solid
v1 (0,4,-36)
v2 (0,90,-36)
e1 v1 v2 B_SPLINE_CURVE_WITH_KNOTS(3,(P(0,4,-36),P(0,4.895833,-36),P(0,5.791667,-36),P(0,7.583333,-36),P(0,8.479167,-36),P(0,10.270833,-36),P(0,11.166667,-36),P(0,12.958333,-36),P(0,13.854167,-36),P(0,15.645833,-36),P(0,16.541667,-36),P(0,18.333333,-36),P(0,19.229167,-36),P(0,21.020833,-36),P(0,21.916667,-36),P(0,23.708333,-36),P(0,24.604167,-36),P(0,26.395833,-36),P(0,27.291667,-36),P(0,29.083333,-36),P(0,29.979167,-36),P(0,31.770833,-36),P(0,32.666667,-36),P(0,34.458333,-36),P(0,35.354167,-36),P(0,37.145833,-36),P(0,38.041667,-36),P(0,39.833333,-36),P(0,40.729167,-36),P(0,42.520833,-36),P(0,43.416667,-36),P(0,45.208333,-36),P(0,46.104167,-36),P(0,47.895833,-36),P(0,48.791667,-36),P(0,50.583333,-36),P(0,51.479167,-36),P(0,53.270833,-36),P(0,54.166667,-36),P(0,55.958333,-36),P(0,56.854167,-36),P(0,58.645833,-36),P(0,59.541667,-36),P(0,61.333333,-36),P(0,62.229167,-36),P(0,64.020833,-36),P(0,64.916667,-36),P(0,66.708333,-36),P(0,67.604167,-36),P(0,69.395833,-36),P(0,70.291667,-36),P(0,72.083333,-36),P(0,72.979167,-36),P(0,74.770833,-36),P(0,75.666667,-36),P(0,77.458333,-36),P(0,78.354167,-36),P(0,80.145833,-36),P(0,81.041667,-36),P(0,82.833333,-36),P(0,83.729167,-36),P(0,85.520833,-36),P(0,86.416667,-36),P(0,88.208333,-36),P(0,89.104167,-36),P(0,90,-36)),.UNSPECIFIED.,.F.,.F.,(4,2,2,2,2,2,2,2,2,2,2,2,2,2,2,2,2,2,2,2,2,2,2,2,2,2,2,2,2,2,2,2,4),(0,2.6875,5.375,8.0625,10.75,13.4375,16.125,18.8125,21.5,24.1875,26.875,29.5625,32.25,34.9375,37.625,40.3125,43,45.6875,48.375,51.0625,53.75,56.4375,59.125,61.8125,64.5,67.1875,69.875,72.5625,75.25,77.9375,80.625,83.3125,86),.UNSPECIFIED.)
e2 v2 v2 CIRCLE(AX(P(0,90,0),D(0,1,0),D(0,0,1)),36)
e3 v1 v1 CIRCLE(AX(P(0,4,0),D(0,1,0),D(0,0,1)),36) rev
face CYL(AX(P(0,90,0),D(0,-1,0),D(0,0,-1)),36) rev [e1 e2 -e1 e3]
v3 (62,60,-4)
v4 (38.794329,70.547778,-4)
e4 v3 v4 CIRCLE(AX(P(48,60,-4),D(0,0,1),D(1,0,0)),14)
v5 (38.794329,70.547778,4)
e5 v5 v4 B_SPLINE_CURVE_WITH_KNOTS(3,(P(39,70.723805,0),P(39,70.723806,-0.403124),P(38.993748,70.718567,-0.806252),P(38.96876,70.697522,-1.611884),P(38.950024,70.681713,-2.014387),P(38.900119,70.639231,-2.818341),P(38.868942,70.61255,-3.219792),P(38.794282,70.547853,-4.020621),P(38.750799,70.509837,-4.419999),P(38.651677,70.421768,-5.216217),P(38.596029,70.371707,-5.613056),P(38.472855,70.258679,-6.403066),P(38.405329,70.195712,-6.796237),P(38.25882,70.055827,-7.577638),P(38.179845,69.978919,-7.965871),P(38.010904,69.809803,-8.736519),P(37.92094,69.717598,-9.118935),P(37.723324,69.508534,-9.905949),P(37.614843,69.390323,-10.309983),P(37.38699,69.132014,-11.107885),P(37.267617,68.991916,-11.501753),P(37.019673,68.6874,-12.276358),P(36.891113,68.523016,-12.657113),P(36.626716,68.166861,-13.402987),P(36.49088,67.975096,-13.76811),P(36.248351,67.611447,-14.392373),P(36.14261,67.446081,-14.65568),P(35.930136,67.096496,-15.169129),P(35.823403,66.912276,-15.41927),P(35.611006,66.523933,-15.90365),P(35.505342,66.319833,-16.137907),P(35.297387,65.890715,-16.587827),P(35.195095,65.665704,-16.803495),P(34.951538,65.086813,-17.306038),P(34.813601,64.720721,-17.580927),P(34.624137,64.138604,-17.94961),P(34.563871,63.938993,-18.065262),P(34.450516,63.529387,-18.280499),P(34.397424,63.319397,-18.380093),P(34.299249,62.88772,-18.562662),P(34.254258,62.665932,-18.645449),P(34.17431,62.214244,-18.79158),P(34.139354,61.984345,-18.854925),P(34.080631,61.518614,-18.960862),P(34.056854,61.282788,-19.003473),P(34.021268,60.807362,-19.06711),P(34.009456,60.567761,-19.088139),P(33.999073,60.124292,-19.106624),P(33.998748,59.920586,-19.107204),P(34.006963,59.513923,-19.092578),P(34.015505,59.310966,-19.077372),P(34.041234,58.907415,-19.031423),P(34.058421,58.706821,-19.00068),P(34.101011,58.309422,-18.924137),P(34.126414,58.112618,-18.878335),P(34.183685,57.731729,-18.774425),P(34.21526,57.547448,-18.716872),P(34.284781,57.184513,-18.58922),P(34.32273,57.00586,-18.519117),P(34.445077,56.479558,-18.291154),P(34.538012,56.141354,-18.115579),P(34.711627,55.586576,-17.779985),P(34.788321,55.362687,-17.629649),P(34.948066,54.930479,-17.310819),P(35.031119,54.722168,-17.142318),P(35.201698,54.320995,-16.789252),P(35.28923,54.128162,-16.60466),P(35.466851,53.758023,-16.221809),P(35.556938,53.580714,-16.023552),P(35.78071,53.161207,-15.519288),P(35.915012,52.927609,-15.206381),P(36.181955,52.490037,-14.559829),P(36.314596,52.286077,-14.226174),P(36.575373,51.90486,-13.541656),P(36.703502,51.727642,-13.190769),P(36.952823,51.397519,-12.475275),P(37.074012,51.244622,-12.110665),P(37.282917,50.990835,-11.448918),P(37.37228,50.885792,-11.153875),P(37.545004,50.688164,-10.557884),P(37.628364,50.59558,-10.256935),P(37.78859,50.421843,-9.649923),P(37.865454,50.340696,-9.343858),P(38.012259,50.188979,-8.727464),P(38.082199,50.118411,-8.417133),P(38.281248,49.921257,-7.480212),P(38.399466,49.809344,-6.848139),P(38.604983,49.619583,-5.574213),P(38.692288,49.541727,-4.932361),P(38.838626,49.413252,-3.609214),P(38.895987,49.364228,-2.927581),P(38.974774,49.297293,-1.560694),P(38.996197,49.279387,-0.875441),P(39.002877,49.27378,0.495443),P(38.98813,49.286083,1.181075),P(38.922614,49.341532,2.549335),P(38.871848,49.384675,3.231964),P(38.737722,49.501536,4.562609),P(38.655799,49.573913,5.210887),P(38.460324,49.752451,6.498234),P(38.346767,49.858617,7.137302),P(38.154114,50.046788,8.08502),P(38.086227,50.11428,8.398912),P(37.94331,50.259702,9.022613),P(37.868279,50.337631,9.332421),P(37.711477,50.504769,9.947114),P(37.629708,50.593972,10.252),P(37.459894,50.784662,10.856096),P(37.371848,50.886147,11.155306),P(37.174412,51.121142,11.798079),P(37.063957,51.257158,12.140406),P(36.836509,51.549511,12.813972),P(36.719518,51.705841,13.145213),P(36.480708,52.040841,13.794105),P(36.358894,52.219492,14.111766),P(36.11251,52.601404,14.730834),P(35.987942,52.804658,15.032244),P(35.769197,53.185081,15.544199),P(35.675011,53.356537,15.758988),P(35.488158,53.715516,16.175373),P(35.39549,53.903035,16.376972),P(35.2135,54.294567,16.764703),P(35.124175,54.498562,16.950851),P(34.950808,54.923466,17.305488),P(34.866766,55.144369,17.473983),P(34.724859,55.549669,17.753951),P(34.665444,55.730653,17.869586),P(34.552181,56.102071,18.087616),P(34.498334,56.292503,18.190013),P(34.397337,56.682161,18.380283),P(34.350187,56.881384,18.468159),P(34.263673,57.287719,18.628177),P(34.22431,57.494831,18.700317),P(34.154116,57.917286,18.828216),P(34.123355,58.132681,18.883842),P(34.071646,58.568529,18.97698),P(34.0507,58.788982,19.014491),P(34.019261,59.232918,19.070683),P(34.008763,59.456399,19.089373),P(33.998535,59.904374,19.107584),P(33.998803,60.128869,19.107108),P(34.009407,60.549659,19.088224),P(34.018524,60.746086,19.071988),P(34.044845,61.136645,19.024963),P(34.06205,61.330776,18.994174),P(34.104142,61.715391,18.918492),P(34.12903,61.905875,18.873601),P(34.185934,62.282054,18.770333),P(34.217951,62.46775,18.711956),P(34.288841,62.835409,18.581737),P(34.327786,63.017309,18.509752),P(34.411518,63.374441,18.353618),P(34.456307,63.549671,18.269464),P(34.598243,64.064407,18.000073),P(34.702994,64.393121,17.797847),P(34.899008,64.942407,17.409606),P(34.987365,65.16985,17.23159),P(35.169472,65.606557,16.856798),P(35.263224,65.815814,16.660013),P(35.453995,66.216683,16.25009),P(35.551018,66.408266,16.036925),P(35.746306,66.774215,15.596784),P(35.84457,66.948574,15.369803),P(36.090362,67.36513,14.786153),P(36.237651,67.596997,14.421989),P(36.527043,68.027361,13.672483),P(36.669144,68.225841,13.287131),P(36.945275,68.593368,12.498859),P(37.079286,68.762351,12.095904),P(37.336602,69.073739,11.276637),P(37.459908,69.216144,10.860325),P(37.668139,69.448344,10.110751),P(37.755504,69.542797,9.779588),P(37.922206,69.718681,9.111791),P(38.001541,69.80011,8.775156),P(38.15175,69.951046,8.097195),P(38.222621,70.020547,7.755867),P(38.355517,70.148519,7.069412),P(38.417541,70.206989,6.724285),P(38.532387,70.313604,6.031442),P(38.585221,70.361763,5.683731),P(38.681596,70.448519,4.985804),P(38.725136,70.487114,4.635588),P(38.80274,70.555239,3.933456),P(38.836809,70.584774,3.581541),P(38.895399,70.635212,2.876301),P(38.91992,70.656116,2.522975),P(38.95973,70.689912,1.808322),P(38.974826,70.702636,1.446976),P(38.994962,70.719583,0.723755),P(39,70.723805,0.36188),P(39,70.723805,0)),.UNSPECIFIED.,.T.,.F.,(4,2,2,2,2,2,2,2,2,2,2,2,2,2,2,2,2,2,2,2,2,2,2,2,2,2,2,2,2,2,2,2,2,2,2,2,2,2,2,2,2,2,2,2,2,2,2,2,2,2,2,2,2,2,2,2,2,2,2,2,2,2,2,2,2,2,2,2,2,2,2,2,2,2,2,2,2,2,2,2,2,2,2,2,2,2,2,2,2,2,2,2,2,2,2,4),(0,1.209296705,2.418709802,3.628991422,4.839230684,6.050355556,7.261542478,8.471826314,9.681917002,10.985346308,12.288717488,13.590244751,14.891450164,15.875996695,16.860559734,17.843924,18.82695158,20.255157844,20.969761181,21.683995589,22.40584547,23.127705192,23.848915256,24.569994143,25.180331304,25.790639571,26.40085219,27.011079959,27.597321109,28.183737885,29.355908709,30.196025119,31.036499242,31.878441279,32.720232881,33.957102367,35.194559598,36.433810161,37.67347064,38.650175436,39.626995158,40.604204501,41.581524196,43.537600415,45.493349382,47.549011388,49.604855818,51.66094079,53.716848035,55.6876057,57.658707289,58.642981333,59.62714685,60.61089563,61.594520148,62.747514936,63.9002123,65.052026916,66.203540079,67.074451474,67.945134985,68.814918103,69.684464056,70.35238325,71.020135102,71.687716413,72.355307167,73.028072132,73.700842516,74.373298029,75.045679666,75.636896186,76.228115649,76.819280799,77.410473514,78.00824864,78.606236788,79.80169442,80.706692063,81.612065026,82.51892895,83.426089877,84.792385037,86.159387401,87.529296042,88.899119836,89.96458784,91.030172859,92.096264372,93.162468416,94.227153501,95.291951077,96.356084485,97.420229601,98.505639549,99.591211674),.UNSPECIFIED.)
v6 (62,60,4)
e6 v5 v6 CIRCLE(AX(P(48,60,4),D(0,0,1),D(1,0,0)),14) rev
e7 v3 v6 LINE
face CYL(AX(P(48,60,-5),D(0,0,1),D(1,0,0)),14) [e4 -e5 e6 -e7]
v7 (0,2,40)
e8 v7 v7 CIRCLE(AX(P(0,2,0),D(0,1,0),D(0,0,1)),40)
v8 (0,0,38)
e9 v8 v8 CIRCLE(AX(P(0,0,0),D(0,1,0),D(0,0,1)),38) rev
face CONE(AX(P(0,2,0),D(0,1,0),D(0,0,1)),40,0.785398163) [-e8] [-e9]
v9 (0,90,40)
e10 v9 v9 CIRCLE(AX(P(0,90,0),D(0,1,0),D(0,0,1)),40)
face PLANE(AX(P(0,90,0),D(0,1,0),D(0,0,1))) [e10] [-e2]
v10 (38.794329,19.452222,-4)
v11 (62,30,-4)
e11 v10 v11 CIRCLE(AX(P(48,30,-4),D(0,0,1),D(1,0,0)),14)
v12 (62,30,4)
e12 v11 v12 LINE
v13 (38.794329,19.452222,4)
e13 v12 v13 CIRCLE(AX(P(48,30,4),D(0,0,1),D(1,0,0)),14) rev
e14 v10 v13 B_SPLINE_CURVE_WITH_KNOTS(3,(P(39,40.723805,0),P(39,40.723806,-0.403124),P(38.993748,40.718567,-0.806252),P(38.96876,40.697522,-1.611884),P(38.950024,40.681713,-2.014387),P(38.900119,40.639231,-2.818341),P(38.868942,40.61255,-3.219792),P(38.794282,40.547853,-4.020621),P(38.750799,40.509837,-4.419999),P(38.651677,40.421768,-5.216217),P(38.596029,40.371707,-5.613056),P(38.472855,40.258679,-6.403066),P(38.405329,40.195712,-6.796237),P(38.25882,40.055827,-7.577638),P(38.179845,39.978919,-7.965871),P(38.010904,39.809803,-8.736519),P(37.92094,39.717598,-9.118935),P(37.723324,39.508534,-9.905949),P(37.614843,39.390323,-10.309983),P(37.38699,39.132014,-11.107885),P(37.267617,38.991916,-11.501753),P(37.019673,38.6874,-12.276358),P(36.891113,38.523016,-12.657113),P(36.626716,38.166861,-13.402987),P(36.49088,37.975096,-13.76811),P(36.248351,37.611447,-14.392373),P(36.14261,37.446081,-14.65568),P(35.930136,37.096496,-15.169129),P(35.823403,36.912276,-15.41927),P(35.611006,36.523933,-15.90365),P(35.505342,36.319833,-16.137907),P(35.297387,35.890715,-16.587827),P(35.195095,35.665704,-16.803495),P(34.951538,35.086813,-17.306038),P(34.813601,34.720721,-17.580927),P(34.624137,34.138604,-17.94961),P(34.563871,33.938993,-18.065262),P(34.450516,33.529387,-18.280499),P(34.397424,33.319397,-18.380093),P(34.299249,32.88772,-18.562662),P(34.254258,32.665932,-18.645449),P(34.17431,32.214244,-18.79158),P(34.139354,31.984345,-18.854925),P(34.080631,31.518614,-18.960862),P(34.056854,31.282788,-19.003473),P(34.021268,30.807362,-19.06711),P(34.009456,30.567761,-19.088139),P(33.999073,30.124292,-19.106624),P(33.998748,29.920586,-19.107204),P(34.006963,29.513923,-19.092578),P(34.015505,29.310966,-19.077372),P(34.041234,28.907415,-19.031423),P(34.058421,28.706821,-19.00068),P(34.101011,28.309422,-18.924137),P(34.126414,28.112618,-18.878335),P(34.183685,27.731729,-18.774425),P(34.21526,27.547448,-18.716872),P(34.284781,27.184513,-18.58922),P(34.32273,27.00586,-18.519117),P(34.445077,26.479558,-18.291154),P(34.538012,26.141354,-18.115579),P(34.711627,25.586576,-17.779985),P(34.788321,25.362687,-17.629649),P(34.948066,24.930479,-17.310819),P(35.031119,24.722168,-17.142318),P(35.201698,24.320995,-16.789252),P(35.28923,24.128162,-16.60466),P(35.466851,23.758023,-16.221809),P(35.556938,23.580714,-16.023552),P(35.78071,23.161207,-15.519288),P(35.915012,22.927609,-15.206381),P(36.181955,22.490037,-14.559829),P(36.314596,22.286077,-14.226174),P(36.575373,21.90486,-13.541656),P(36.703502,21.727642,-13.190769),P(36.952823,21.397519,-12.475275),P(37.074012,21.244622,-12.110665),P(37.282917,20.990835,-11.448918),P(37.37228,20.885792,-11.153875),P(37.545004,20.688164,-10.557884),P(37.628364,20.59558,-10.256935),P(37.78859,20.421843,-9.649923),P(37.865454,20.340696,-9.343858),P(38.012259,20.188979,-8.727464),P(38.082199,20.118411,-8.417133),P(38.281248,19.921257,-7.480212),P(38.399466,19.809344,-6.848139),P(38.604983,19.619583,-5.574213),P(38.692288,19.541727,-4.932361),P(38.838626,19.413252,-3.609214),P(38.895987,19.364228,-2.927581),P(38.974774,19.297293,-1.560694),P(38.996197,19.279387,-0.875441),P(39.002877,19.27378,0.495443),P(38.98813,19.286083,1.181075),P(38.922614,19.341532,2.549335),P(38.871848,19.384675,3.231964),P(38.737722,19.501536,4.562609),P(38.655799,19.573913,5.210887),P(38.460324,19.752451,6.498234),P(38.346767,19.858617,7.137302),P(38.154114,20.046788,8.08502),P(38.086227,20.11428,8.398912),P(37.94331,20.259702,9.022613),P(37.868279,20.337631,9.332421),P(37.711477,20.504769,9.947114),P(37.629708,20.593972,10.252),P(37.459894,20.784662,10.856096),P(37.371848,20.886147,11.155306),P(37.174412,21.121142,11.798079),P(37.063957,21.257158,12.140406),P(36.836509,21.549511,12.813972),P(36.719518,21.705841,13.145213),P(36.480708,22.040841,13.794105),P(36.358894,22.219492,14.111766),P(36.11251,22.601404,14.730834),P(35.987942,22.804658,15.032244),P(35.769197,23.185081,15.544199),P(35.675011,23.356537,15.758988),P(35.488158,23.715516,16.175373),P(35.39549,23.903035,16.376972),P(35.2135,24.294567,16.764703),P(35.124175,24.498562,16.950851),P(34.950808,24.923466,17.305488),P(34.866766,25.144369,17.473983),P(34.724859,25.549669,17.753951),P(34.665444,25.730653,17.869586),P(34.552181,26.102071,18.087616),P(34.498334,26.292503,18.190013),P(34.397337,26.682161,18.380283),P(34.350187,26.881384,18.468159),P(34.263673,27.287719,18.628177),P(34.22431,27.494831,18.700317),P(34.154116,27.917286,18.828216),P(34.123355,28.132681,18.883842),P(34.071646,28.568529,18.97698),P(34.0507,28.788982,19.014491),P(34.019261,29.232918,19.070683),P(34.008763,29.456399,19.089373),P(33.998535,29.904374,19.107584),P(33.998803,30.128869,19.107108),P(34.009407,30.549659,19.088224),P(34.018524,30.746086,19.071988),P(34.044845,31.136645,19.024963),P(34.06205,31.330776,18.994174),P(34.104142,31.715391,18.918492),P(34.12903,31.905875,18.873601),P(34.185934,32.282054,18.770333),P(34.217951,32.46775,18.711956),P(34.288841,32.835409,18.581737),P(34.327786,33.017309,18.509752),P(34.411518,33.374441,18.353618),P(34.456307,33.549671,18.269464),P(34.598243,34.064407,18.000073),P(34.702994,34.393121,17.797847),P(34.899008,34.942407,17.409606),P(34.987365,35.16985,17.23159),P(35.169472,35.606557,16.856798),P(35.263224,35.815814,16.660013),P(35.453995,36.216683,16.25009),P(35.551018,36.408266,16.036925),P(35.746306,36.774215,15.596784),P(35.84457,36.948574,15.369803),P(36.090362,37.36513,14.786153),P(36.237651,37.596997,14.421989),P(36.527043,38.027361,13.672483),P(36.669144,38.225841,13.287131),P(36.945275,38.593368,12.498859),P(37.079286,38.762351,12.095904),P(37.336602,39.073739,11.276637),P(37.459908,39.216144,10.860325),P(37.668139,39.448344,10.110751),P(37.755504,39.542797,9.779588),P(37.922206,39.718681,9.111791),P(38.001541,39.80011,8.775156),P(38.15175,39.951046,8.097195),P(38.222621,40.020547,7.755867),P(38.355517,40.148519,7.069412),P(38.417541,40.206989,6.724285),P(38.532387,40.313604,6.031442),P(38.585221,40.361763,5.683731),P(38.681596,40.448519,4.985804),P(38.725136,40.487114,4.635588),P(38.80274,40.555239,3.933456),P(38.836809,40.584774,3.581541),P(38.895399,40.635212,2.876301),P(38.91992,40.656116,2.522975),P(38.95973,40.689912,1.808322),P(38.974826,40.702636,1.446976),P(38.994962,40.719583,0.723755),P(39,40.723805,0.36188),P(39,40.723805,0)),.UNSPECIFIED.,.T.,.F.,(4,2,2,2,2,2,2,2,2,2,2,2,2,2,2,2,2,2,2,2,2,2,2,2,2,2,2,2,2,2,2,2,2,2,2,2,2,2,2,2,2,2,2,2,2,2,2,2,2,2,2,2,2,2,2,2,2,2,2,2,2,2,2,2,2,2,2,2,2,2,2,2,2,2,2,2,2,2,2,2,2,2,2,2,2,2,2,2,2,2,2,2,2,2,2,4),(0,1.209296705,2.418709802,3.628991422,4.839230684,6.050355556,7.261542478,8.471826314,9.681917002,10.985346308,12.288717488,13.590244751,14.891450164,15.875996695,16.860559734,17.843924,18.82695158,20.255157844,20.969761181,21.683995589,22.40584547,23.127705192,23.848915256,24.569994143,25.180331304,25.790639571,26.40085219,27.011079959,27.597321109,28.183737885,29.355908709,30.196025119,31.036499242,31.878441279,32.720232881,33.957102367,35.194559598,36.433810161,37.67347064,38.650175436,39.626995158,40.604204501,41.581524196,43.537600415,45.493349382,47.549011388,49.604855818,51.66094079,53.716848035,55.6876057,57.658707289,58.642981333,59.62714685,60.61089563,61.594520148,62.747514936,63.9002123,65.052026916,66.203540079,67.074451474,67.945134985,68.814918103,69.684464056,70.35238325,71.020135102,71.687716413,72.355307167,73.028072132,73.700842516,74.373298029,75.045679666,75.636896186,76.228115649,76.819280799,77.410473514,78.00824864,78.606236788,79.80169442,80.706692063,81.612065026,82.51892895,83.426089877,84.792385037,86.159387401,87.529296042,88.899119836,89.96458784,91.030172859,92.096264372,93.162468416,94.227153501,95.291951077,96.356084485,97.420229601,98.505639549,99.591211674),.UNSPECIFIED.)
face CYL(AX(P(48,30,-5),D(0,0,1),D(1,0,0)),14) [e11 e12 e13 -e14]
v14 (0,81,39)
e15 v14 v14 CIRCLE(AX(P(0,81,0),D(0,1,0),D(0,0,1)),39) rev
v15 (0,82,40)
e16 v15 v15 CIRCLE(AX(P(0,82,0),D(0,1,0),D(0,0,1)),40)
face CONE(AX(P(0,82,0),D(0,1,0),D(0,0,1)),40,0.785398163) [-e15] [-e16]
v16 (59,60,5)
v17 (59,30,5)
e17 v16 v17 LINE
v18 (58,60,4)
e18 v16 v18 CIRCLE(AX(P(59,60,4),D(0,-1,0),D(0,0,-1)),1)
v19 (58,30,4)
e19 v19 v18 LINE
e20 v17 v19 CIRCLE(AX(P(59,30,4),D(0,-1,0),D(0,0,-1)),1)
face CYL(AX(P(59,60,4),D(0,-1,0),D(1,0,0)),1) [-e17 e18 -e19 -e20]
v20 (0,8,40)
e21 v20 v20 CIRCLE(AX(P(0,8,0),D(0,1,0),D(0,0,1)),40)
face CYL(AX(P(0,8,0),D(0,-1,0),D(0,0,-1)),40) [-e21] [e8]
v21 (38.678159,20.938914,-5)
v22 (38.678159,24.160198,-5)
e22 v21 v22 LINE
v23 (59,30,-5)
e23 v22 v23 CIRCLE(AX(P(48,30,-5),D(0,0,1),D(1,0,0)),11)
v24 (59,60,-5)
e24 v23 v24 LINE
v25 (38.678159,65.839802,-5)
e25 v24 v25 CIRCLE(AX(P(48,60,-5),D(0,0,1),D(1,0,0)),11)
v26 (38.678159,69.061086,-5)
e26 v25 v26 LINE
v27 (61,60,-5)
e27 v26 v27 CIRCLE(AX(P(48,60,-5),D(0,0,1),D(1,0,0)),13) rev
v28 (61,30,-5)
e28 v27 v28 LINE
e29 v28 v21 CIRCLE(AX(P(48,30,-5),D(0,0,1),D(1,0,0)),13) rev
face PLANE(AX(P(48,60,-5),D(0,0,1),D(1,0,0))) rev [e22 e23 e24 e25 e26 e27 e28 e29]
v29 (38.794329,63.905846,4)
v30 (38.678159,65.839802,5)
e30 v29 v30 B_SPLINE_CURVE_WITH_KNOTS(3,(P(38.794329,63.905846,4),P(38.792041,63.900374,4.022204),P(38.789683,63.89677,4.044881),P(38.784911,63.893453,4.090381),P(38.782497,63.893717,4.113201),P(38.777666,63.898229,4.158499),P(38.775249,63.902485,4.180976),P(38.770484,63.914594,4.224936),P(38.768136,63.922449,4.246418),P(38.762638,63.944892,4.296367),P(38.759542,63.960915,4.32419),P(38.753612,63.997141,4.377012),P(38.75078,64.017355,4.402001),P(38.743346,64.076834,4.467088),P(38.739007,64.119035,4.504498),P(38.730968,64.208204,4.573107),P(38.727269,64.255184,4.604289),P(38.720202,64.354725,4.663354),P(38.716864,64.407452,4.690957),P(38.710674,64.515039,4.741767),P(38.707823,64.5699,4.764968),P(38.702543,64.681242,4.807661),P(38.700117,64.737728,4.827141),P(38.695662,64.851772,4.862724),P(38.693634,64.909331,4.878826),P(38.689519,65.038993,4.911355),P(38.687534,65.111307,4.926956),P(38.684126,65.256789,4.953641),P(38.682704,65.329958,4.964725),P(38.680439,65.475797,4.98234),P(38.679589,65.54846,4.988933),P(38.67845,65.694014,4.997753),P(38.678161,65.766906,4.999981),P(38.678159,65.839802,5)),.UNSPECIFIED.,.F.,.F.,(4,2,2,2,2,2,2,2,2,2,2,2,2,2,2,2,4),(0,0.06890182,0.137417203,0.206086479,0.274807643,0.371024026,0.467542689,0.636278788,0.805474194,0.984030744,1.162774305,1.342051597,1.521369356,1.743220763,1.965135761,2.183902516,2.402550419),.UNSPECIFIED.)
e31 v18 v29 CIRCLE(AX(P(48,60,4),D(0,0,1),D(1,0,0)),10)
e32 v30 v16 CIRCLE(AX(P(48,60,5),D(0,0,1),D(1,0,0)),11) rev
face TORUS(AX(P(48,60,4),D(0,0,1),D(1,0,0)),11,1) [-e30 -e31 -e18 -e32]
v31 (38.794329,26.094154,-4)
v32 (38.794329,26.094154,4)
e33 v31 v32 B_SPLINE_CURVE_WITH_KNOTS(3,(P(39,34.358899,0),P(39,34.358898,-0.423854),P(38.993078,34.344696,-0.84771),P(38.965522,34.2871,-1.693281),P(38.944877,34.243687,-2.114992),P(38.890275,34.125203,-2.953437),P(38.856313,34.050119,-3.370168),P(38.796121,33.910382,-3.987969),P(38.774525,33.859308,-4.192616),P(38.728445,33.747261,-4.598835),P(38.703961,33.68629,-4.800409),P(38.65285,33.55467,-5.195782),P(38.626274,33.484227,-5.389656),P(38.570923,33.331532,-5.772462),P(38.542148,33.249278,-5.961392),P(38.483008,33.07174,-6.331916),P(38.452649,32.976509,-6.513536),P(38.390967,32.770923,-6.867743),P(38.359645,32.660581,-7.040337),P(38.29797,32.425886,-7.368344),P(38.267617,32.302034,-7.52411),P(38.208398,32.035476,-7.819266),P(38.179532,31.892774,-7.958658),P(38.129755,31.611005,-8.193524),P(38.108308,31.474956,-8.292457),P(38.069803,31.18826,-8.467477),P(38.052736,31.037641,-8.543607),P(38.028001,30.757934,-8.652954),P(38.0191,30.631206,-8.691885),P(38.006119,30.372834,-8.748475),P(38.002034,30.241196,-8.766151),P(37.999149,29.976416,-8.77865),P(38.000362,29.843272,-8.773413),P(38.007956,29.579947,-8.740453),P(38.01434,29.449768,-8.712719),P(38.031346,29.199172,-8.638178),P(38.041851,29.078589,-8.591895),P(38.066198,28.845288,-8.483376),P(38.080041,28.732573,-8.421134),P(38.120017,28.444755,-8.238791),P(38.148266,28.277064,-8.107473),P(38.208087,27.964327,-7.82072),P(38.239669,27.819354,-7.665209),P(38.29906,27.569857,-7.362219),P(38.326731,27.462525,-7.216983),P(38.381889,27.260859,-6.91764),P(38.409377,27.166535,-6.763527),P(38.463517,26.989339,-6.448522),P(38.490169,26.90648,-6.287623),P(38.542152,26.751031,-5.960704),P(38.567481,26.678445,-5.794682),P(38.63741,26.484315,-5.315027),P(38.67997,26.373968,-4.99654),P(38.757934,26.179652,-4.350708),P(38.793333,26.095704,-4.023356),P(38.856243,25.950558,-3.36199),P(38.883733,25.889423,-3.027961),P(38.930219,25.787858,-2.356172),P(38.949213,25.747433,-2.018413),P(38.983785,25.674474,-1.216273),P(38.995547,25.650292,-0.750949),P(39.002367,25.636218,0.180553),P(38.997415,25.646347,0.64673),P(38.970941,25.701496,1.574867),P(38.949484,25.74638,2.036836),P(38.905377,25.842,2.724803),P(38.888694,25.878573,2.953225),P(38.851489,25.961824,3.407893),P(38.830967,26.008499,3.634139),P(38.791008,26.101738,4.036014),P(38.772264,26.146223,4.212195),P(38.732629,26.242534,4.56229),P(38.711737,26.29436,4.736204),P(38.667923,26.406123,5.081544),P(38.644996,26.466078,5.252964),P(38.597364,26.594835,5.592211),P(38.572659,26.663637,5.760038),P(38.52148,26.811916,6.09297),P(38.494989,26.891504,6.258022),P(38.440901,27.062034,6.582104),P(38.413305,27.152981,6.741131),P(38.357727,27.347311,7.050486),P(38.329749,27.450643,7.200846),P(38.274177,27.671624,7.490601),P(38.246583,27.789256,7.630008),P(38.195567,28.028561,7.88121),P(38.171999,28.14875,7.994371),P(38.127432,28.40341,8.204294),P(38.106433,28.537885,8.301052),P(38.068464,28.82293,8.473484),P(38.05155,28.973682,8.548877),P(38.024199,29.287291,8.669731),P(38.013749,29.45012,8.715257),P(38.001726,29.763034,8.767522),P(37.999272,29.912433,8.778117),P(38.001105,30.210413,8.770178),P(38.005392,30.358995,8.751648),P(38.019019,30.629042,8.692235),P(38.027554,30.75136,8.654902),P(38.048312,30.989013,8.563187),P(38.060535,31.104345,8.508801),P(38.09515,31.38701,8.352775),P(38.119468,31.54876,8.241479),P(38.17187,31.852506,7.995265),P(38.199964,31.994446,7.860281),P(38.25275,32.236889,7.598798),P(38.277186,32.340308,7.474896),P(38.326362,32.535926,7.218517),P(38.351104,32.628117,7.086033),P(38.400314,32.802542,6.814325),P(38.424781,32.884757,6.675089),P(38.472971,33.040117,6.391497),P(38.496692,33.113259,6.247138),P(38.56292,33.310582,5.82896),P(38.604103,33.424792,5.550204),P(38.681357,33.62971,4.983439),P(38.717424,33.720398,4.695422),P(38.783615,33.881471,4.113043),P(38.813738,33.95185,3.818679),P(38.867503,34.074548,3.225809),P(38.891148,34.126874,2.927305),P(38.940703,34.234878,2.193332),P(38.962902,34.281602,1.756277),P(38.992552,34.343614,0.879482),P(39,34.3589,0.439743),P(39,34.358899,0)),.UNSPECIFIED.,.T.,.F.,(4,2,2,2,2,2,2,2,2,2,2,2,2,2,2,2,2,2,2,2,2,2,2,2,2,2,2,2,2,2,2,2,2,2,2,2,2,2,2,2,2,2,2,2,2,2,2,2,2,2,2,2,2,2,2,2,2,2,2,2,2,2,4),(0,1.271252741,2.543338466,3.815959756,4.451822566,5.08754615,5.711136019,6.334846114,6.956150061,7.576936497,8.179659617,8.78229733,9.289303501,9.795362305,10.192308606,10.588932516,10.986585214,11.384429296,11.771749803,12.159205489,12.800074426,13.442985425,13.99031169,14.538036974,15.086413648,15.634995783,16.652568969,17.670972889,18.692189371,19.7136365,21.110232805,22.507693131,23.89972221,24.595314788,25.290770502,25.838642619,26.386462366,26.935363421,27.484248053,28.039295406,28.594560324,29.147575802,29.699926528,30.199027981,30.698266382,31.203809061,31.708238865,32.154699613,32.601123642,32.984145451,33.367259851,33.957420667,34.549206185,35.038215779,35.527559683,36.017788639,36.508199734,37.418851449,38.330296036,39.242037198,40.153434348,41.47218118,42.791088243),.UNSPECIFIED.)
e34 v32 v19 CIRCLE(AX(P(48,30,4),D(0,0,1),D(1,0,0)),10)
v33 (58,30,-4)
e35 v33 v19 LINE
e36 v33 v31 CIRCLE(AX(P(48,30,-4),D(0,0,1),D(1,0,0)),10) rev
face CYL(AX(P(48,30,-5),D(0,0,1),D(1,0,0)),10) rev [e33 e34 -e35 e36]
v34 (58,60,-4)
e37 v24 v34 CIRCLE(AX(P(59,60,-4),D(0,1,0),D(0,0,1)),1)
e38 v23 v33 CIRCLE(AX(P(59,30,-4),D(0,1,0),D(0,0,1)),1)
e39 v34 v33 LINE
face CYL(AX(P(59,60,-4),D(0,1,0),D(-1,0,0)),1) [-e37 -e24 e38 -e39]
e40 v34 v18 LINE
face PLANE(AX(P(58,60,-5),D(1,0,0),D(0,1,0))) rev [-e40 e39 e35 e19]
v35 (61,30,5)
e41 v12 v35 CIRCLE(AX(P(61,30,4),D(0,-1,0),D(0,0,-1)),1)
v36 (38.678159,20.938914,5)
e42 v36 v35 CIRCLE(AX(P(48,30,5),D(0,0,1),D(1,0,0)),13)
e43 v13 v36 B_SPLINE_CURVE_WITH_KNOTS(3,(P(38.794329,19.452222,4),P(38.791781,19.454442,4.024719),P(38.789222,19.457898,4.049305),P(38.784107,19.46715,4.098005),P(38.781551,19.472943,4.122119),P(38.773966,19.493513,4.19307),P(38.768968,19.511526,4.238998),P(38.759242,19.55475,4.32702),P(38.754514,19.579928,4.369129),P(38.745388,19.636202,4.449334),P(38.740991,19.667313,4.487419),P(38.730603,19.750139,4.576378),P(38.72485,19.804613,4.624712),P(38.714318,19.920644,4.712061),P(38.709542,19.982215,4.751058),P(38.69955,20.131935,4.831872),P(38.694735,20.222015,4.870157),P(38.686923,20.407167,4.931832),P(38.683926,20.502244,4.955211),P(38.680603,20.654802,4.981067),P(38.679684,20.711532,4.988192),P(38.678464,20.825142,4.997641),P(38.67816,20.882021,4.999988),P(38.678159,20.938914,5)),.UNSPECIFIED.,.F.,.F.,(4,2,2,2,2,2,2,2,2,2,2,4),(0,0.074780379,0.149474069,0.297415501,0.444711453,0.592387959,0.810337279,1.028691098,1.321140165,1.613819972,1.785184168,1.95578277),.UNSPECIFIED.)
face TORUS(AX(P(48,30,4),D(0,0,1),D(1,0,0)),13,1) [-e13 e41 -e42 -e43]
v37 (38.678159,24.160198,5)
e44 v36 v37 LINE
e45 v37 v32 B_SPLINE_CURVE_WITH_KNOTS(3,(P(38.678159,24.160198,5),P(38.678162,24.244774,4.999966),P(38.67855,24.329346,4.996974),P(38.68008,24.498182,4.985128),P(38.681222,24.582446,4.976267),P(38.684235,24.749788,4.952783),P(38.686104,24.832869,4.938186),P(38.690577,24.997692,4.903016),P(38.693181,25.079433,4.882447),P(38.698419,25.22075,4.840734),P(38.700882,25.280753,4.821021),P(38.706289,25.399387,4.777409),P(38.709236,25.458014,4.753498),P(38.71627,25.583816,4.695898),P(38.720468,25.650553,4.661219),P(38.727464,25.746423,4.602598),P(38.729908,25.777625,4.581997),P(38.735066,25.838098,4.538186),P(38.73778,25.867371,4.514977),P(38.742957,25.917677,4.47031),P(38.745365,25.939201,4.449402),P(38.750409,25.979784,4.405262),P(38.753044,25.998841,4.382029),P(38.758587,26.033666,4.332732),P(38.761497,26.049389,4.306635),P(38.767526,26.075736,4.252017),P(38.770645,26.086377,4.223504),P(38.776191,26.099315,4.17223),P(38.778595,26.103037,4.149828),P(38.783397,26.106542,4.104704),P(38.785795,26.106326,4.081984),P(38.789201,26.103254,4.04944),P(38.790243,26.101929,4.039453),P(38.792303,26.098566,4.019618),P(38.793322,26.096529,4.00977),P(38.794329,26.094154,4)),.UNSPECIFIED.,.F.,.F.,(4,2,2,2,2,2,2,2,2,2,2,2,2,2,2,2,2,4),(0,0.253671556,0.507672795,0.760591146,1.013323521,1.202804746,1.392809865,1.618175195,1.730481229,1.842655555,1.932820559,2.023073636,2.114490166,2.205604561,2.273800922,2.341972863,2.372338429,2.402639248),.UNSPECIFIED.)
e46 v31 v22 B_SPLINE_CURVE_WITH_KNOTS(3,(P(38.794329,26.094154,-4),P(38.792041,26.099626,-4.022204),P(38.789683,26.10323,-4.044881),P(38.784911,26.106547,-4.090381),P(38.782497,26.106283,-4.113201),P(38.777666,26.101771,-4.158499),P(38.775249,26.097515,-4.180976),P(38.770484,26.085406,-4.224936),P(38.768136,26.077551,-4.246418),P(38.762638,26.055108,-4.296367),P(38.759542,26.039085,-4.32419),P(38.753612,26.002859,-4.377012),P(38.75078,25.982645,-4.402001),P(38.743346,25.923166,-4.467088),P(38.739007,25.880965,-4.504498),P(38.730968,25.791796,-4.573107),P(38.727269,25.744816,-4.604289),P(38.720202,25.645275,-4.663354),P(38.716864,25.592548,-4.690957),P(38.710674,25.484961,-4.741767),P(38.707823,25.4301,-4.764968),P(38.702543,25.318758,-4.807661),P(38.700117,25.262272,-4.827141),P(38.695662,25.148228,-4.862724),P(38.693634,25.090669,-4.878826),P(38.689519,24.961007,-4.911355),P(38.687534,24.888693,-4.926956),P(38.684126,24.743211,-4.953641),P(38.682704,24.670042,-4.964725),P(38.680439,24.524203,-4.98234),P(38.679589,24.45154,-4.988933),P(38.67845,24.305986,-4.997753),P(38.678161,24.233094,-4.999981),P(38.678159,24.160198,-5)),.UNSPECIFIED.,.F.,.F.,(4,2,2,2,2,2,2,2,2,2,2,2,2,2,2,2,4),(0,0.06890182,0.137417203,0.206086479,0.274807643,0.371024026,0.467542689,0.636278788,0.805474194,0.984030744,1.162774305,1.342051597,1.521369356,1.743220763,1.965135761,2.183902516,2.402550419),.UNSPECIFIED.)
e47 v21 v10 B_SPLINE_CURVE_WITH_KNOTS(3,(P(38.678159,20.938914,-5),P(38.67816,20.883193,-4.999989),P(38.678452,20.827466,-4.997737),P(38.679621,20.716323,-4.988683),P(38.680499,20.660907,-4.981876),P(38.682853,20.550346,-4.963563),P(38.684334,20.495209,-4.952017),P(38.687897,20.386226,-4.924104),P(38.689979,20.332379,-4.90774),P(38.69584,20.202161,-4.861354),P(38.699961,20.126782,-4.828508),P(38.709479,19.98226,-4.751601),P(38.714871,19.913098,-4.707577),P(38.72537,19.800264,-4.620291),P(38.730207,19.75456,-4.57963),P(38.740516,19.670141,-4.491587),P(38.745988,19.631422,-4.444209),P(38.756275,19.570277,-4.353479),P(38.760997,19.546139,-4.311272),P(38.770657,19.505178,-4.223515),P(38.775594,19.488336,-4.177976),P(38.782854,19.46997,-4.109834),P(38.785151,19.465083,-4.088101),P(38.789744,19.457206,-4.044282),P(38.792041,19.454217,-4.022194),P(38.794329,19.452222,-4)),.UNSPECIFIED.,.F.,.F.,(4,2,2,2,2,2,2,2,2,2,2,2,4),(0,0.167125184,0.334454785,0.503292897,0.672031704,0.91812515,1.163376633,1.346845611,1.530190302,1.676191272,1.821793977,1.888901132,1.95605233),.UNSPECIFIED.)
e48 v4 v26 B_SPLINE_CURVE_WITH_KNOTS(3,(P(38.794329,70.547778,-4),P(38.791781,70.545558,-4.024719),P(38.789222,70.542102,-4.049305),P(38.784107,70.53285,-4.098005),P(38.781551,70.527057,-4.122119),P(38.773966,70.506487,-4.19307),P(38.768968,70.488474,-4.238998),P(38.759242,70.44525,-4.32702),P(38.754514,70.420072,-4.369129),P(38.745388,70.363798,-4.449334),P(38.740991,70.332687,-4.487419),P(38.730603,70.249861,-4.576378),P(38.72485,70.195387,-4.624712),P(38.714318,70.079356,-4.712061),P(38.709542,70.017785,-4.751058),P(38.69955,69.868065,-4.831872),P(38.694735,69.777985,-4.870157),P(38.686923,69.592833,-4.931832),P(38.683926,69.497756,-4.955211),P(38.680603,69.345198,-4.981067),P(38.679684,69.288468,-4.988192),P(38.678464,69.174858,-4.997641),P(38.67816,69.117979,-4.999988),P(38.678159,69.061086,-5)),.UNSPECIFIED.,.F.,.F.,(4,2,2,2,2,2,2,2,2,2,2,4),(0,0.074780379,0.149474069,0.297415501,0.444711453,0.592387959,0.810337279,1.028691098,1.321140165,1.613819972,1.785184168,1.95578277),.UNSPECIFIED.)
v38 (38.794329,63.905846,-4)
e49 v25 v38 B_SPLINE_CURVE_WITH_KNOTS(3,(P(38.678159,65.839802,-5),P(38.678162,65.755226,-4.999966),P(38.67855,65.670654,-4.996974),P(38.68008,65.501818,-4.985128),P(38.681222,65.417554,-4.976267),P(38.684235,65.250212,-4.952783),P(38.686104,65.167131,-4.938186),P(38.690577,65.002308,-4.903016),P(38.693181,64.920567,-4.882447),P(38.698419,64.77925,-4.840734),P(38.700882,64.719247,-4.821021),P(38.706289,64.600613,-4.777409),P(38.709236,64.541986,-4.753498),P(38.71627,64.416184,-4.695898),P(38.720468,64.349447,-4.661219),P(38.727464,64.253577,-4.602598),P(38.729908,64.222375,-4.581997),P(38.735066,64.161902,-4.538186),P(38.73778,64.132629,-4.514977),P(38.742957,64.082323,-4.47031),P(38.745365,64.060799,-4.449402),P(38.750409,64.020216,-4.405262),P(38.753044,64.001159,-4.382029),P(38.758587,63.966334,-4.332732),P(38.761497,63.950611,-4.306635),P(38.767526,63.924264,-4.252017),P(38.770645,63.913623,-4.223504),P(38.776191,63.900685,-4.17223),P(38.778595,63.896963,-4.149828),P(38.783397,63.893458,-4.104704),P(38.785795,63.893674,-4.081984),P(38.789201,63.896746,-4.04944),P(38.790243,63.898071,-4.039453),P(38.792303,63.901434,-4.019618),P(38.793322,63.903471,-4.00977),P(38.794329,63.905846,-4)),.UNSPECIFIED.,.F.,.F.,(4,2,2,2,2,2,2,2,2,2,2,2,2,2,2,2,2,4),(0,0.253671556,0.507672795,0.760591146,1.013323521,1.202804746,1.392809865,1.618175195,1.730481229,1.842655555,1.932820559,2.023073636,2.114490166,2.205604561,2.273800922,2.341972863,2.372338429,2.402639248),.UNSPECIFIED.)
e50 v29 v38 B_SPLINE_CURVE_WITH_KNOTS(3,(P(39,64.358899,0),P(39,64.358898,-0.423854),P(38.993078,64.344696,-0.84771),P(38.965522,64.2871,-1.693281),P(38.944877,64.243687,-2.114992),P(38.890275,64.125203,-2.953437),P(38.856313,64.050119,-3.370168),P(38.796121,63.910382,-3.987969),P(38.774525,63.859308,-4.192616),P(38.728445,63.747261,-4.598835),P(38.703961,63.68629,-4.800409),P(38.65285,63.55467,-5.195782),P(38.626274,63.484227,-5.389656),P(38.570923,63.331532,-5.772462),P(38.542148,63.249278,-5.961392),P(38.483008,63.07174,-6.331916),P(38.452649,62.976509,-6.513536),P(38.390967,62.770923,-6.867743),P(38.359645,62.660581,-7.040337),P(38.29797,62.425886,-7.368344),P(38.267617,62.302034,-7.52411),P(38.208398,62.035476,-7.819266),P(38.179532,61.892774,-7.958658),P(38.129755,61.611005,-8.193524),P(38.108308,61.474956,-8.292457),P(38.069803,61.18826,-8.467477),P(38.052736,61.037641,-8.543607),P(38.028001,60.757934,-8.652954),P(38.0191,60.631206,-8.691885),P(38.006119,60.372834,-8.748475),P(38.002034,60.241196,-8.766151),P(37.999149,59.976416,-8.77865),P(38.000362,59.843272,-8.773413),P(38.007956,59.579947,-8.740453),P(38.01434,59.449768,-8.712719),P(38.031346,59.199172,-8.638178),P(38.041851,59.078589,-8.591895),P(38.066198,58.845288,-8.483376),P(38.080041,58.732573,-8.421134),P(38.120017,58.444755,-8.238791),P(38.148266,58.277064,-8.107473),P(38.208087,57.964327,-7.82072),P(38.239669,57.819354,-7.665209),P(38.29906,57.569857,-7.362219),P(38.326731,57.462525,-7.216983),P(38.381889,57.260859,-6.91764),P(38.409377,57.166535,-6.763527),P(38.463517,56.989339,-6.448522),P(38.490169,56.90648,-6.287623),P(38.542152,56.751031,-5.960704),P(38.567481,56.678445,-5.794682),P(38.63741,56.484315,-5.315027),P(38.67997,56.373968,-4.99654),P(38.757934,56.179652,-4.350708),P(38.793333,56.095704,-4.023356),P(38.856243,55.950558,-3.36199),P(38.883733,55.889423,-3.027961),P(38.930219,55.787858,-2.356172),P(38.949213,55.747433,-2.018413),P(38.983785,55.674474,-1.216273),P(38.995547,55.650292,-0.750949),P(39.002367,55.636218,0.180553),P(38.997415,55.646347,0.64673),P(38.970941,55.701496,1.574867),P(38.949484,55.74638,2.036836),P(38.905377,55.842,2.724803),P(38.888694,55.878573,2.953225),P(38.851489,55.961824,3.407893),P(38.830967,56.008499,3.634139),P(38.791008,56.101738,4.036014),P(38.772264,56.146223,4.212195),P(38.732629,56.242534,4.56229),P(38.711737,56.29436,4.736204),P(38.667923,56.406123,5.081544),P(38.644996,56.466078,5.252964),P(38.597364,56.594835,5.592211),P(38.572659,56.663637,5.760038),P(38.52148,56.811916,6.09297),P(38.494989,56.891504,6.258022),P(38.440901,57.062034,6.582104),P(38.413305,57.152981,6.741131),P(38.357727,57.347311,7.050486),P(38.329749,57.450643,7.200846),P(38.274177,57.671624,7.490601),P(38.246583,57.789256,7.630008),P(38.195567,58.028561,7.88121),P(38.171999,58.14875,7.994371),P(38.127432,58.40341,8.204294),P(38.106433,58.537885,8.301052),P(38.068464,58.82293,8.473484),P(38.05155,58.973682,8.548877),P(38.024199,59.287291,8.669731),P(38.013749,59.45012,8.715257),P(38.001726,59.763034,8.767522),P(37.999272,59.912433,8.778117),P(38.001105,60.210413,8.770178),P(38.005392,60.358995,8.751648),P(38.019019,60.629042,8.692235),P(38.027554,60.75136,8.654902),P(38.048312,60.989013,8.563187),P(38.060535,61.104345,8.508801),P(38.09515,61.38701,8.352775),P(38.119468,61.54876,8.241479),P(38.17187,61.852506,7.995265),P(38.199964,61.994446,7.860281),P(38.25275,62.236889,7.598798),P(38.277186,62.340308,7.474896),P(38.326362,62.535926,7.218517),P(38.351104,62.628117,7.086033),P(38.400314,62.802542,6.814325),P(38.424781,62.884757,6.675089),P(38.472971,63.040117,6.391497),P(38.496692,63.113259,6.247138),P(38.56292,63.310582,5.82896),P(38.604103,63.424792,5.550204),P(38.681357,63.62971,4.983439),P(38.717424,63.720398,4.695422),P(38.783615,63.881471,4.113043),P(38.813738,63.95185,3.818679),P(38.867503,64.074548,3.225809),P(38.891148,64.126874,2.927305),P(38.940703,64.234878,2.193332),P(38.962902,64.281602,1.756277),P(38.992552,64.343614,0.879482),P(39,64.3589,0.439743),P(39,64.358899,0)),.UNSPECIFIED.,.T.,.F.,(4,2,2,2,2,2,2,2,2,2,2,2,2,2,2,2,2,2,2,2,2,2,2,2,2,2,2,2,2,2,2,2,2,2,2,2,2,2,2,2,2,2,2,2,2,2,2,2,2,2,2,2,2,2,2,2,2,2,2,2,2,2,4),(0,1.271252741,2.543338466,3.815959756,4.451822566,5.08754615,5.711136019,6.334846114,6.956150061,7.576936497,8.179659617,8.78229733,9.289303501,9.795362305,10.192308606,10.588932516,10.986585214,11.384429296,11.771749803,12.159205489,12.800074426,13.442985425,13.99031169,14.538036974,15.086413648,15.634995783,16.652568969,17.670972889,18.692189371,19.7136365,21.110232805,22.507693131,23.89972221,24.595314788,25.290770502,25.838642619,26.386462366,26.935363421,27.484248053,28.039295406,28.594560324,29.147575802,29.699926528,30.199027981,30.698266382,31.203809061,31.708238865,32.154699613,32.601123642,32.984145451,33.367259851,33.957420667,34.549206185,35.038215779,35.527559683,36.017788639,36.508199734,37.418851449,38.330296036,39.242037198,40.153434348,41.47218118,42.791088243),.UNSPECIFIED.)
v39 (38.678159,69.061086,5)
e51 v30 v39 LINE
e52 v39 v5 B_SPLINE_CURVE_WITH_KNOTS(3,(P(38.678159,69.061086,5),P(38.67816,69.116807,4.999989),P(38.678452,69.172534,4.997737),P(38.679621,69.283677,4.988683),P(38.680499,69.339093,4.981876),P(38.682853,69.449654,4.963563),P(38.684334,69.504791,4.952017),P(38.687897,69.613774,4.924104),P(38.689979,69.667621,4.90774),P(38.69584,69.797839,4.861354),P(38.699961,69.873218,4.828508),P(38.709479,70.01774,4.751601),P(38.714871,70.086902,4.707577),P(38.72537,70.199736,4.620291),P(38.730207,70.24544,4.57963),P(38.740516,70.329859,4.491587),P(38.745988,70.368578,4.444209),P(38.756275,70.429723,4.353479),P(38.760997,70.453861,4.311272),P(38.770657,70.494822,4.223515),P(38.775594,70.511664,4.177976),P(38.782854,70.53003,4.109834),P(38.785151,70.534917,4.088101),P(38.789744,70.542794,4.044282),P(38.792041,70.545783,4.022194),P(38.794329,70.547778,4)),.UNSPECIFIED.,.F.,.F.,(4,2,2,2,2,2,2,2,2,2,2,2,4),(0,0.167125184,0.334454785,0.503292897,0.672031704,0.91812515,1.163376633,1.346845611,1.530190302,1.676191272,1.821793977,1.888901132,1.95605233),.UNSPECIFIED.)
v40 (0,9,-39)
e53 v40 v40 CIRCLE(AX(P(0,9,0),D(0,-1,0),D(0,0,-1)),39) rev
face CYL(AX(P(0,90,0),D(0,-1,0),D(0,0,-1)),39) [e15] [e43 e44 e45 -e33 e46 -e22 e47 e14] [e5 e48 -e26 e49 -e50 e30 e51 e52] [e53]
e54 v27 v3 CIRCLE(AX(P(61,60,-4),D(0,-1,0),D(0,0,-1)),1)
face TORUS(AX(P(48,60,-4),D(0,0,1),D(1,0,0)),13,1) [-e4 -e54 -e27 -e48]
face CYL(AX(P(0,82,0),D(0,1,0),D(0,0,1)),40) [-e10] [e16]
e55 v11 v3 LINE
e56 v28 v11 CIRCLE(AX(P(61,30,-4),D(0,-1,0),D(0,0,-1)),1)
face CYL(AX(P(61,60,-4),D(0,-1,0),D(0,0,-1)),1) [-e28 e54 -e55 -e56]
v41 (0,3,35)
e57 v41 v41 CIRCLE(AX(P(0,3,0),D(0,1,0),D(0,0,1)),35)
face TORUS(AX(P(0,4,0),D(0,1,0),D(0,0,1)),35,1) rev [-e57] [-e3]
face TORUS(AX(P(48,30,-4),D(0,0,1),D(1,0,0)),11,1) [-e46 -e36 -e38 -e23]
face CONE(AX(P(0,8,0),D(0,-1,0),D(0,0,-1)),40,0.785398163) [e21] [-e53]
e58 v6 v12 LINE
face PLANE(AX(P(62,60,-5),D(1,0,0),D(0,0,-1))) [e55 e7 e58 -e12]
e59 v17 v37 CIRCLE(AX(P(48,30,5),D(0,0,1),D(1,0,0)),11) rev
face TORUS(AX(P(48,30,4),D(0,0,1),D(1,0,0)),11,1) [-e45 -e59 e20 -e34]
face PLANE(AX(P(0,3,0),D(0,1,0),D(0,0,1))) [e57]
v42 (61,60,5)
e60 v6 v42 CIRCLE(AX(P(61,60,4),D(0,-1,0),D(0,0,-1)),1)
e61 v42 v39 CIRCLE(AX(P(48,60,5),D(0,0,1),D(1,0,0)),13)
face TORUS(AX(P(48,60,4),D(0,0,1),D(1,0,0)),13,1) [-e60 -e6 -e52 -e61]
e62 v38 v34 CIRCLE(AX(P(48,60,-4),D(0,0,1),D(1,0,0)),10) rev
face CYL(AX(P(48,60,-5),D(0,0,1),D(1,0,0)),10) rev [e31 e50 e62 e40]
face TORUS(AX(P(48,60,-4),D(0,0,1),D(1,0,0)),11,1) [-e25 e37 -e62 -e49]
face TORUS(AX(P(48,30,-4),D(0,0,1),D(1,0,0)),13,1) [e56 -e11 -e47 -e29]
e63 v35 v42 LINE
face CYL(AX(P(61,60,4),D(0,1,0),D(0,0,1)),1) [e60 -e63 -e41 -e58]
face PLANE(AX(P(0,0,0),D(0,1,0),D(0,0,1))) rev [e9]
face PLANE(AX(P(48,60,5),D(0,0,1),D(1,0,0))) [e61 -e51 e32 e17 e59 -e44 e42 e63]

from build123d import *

# Parameters (mm, degrees)
SKETCH1_R               = 39
BOSS_EXTRUDE1_DEPTH     = 90
SHELL3_T                = -3
BOSS_EXTRUDE3_START     = -8
SKETCH6_R               = 40
SKETCH6_R_2             = 39
BOSS_EXTRUDE3_DEPTH     = 8
CHAMFER2_SIZE           = 2
CHAMFER3_SIZE           = 1
CHAMFER4_SIZE           = 1
BOSS_EXTRUDE8_START     = 30
BOSS_EXTRUDE8_OUTLINE_W = 4
BOSS_EXTRUDE8_OUTLINE_H = 10
BOSS_EXTRUDE8_DEPTH     = 29.9999999
BOSS_EXTRUDE8_START_2   = -5
BOSS_EXTRUDE8_2_DEPTH   = 10
CUT_EXTRUDE3_START      = -70
SKETCH11_R              = 36
CUT_EXTRUDE3_DEPTH      = 70
FILLET4_R               = 1
FILLET5_R               = 1


with BuildPart() as part:
    # Sketch1 → Boss-Extrude1 (new body)
    with BuildSketch(Plane(origin=(0, 0, 0), x_dir=(1, 0, 0), z_dir=(0, 1, 0))):
        with Locations(Location((0, 0, 0), (0, 0, 90))):
            Circle(SKETCH1_R)
    extrude(amount=BOSS_EXTRUDE1_DEPTH)

    # Shell3
    shell3_openings = [part.faces().sort_by_distance(p)[0] for p in [
        (0, 90, 0),
    ]]
    offset(amount=SHELL3_T, openings=shell3_openings, kind=Kind.INTERSECTION)

    # Sketch6 → Boss-Extrude3 (add)
    with BuildSketch(Plane(origin=(0, 90, 0), x_dir=(1, 0, 0), z_dir=(0, 1, 0)).offset(BOSS_EXTRUDE3_START)):
        with Locations(Location((0, 0, 0), (0, 0, 270))):
            Circle(SKETCH6_R)
        with Locations(Location((0, 0, 0), (0, 0, 90))):
            Circle(SKETCH6_R_2, mode=Mode.SUBTRACT)
    boss_extrude3 = extrude(amount=BOSS_EXTRUDE3_DEPTH)

    # Mirror1: Boss-Extrude3 across plane
    add(boss_extrude3.mirror(Plane.ZX.offset(45)))

    # Chamfer2
    chamfer2_edges = [part.edges().sort_by_distance(p)[0] for p in [
        (0, 0, -40),
    ]]
    chamfer(chamfer2_edges, length=CHAMFER2_SIZE)

    # Chamfer3
    chamfer3_edges = [part.edges().sort_by_distance(p)[0] for p in [
        (0, 8, 39),
    ]]
    chamfer(chamfer3_edges, length=CHAMFER3_SIZE - 0.0001)  # a hair under: the kernel refuses the full size

    # Chamfer4
    chamfer4_edges = [part.edges().sort_by_distance(p)[0] for p in [
        (0, 82, 39),
    ]]
    chamfer(chamfer4_edges, length=CHAMFER4_SIZE - 0.0001)  # a hair under: the kernel refuses the full size

    # Boss-Extrude8: read off the stored shape, not the designer's step
    # Boss-Extrude8 outline → Boss-Extrude8 (add)
    with BuildSketch(Plane(origin=(0, 0, 0), x_dir=(1, 0, 0), z_dir=(0, 1, 0)).offset(BOSS_EXTRUDE8_START)):
        with BuildLine():
            Line((35.65108694, 5), (34, 5))
            Line((34, 5), (34, -5))
            Line((34, -5), (35.65108694, -5))
            ThreePointArc((35.65108694, -5), (36, 0), (35.65108694, 5))
        make_face()
        with Locations((60, 0)):
            Rectangle(BOSS_EXTRUDE8_OUTLINE_W, BOSS_EXTRUDE8_OUTLINE_H)
    extrude(amount=BOSS_EXTRUDE8_DEPTH)

    # Boss-Extrude8 2 outline → Boss-Extrude8 2 (add)
    with BuildSketch(Plane.XY.offset(BOSS_EXTRUDE8_START_2)):
        with BuildLine():
            Line((37.272505048, 30), (34, 30))
            ThreePointArc((34, 30), (34.509326065, 26.258113205), (36.000245256, 22.788489335))
            Line((36.000245256, 22.788489335), (37.093979465, 20.968545795))
            Line((37.093979465, 20.968545795), (38.678159212, 19.554748241))
            ThreePointArc((38.678159212, 19.554748241), (53.722509457, 17.222954742), (62, 30))
            Line((62, 30), (58, 30))
            ThreePointArc((58, 30), (49.841411431, 20.171001885), (38.678159212, 26.380154103))
            Line((38.678159212, 26.380154103), (37.272505048, 30))
        make_face()
        with BuildLine():
            Line((34, 60), (37.27250501, 59.9999999))
            Line((37.27250501, 59.9999999), (38.678159212, 63.619845897))
            ThreePointArc((38.678159212, 63.619845897), (49.841411431, 69.828998115), (58, 60))
            Line((58, 60), (62, 60))
            ThreePointArc((62, 60), (53.722509457, 72.777045258), (38.678159212, 70.445251759))
            Line((38.678159212, 70.445251759), (37.094524497, 69.031940618))
            Line((37.094524497, 69.031940618), (36.000980999, 67.212734781))
            ThreePointArc((36.000980999, 67.212734781), (34.509516947, 63.742574915), (34, 60))
        make_face()
    extrude(amount=BOSS_EXTRUDE8_2_DEPTH)

    # Sketch11 → Cut-Extrude3 (cut)
    with BuildSketch(Plane(origin=(0, 90, 0), x_dir=(1, 0, 0), z_dir=(0, 1, 0)).offset(CUT_EXTRUDE3_START)):
        with Locations(Location((0, 0, 0), (0, 0, 90))):
            Circle(SKETCH11_R)
    extrude(amount=CUT_EXTRUDE3_DEPTH, mode=Mode.SUBTRACT)

    # Fillet4
    fillet4_edges = [part.edges().sort_by_distance(p)[0] for p in [
        (49.841411431, 69.828998115, -5),
        (58, 44.99999995, -5),
        (53.722509457, 17.222954742, -5),
        (53.722509457, 72.777045258, -5),
        (49.841411431, 20.171001885, 5),
        (49.841411431, 69.828998115, 5),
        (53.722509457, 17.222954742, 5),
        (53.722509457, 72.777045258, 5),
        (49.841411431, 20.171001885, -5),
        (62, 44.99999995, -5),
        (58, 44.99999995, 5),
        (62, 44.99999995, 5),
    ]]
    fillet(fillet4_edges, radius=FILLET4_R)

    # Fillet5
    fillet5_edges = [part.edges().sort_by_distance(p)[0] for p in [
        (0, 3, 36),
    ]]
    fillet(fillet5_edges, radius=FILLET5_R)


solid = part.part
